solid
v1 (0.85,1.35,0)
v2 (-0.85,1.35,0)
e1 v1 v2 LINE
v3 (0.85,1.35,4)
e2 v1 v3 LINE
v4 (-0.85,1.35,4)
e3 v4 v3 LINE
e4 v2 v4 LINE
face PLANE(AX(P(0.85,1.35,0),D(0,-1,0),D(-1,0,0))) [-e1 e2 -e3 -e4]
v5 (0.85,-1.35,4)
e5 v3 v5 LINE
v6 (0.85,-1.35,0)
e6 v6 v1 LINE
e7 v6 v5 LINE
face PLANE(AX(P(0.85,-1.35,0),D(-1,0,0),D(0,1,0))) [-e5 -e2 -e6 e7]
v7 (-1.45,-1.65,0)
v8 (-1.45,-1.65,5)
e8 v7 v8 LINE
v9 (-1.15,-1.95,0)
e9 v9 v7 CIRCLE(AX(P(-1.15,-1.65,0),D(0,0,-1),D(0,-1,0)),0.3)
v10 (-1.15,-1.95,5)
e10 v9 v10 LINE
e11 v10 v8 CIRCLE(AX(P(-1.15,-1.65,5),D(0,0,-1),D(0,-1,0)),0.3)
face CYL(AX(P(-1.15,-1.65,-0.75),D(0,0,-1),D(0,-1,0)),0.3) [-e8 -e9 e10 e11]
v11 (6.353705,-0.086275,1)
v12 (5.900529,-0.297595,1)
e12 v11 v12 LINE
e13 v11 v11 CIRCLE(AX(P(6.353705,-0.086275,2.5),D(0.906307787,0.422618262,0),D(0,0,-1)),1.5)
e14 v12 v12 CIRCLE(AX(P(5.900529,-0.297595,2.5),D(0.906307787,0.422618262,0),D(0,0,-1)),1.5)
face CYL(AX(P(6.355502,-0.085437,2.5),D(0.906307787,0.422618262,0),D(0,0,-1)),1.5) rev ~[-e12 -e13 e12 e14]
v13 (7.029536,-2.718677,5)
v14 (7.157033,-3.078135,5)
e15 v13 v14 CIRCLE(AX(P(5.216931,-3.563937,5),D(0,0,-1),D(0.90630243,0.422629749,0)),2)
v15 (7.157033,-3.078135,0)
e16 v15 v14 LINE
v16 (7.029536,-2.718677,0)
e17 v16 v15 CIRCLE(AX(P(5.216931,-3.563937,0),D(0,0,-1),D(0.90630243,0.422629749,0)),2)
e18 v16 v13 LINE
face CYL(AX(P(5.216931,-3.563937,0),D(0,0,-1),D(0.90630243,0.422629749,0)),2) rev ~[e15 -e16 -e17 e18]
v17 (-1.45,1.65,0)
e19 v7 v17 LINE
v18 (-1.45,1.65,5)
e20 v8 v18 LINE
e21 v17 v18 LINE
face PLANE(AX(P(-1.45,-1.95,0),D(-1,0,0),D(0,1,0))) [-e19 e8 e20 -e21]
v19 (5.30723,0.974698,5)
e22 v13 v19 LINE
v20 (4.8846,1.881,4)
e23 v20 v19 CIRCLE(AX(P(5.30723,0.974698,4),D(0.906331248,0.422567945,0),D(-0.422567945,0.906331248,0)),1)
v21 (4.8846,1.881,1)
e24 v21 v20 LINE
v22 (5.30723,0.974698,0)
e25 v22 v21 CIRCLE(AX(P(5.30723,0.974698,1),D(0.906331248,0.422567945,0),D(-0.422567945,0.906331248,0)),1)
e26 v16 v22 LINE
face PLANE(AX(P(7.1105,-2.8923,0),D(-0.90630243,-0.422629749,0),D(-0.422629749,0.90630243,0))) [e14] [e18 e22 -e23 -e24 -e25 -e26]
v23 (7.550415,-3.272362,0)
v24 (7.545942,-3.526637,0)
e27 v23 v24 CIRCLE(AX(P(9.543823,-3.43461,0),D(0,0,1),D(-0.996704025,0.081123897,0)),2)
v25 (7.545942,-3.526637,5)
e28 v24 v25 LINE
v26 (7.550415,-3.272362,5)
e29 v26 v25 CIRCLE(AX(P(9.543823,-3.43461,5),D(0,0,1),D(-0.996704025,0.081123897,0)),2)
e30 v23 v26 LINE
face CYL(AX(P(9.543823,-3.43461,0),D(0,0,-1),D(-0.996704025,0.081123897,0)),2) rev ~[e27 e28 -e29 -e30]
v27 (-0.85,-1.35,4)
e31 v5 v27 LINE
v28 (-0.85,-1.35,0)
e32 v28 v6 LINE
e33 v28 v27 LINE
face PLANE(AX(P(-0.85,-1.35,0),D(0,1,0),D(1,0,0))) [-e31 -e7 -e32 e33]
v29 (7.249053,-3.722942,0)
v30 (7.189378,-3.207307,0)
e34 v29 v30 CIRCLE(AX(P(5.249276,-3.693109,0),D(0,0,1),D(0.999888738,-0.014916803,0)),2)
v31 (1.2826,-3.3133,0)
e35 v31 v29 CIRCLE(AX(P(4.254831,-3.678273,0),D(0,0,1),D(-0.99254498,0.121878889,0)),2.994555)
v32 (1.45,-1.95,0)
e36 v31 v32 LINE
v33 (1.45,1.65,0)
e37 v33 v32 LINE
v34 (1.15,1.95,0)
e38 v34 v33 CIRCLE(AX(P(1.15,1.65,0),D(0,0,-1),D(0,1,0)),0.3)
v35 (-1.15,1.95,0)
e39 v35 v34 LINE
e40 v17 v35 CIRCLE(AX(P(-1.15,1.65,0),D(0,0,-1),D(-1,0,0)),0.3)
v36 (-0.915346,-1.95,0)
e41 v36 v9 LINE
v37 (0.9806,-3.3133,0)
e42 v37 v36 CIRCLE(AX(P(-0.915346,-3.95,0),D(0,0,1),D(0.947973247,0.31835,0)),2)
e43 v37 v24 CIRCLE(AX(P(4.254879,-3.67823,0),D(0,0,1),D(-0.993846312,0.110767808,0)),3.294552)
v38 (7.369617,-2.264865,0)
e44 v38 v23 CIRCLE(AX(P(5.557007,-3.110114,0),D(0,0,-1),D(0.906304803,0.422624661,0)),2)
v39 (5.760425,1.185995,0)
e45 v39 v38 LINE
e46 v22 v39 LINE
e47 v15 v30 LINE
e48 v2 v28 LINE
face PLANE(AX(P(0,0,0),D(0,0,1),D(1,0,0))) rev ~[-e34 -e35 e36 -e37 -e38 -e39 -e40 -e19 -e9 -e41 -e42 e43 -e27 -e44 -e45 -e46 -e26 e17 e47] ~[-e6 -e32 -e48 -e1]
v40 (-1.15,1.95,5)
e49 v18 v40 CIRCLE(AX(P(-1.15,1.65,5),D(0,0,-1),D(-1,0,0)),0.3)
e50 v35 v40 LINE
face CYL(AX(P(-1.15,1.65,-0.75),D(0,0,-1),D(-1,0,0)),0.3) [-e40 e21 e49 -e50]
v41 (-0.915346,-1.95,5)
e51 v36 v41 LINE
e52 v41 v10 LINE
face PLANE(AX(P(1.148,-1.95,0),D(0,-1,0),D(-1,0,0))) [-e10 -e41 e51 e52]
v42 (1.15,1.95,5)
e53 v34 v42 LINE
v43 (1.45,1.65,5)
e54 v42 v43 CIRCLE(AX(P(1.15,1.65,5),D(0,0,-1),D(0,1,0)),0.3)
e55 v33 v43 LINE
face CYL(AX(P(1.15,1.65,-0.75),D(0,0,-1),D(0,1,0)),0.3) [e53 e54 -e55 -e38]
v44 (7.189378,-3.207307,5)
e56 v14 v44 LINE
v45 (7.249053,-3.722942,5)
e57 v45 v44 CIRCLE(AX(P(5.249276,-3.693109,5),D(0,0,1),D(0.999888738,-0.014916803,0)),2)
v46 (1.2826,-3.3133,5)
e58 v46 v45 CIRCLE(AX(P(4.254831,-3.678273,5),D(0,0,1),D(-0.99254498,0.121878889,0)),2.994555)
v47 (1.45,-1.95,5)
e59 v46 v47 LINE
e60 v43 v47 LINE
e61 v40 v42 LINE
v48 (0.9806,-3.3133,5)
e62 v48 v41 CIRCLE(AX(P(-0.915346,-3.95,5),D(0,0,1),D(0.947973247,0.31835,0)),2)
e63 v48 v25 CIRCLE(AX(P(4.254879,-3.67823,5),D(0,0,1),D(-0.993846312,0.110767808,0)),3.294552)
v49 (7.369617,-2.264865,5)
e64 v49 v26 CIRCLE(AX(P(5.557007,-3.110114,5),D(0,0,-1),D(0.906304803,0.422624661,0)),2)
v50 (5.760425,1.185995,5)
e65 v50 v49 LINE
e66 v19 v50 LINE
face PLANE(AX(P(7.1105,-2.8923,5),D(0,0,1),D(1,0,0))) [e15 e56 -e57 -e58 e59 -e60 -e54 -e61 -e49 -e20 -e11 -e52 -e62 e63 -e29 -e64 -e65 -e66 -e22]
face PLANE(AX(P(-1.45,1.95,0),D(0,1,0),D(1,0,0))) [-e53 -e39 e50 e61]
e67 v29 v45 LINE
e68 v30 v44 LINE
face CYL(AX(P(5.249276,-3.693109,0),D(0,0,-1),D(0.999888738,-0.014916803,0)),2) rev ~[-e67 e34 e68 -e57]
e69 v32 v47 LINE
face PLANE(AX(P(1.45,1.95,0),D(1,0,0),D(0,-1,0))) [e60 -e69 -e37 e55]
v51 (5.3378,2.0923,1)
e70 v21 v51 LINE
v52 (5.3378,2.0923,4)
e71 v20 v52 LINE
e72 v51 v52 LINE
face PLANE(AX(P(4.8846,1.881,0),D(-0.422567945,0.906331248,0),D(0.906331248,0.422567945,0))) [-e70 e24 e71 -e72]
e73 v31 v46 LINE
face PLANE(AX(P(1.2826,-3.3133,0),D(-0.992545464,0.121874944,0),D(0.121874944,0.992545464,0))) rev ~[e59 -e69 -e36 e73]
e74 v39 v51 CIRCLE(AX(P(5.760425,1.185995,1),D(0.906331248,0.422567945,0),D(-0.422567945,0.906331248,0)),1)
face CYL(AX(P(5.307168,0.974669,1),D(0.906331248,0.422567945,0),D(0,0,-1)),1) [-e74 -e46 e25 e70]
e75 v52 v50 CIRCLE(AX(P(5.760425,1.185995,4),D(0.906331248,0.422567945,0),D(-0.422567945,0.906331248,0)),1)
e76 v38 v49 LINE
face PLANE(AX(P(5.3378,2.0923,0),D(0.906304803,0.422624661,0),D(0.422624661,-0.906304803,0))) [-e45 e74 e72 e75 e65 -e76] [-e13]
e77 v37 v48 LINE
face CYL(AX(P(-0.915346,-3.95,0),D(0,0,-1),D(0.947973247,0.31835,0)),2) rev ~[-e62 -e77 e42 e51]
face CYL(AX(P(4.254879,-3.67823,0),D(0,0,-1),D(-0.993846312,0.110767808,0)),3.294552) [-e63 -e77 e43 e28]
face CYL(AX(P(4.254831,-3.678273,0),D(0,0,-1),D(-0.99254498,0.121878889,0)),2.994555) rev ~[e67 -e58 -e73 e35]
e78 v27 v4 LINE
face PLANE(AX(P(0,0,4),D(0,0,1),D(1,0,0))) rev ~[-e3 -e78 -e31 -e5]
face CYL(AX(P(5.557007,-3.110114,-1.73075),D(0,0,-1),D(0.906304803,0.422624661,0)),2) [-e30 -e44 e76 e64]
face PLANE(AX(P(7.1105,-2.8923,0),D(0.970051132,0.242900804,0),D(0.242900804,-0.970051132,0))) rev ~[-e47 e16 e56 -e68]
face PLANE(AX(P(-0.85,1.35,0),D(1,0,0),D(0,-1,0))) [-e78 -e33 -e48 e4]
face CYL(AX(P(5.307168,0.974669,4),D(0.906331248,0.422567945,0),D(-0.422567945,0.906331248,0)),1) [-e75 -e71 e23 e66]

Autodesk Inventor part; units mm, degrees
ref_plane "YZ Plane" through (0, 0, 0) normal (1, 0, 0) x (0, 1, 0)
ref_plane "XZ Plane" through (0, 0, 0) normal (0, 1, 0) x (-1, 0, 0)
ref_plane "XY Plane" through (0, 0, 0) normal (0, 0, 1) x (1, 0, 0)
sketch "Sketch1" plane through (0, 0, 0) normal (0, 0, 1) x (1, 0, 0)
  line L0 (-0.85, -1.35) -> (0.85, -1.35)
  line L1 (0.85, -1.35) -> (0.85, 1.35)
  line L2 (0.85, 1.35) -> (-0.85, 1.35)
  line L3 (-0.85, 1.35) -> (-0.85, -1.35)
  line L4 (-0.85, -1.35) -> (0.85, 1.35) construction
  line L5 (0.85, -1.35) -> (-0.85, 1.35) construction
  line L6 (7.1105, -2.8923) -> (4.8846, 1.881)
  line L7 (4.8846, 1.881) -> (5.3378, 2.0923)
  line L8 (5.3378, 2.0923) -> (7.6622, -2.8923)
  line L9 (-1.45, 1.95) -> (1.45, 1.95)
  line L10 (1.45, 1.95) -> (1.45, -1.95)
  line L11 (1.148, -1.95) -> (-1.45, -1.95)
  line L12 (-1.45, -1.95) -> (-1.45, 1.95)
  line L13 (1.45, -1.95) -> (1.148, -1.95) construction
  line L14 (1.148, -1.95) -> (0.9806, -3.3133)
  line L15 (0.9806, -3.3133) -> (1.2826, -3.3133) construction
  line L16 (1.2826, -3.3133) -> (1.45, -1.95)
  line L17 (7.6622, -2.8923) -> (7.1105, -2.8923) construction
  line L18 (7.2357, -3.3923) -> (7.537, -3.3923) construction
  arc A0 (1.2826, -3.3133) -> (7.2357, -3.3923) centre (4.2548, -3.6783) ccw
  arc A1 (0.9806, -3.3133) -> (7.537, -3.3923) centre (4.2548, -3.6783) ccw
  line L19 (7.537, -3.3923) -> (7.6622, -2.8923)
  line L20 (7.1105, -2.8923) -> (7.2357, -3.3923)
  point P0 (0, 0)
  point P1 (6.5, -0.4)
  dimension "d0" = 1.7
  dimension "d1" = 2.7
  dimension "d4" = 0.5
  dimension "d5" = 5.5
  dimension "d16" = 0.6
  dimension "d17" = 0.6
  dimension "d18" = 0.6
  dimension "d19" = 0.6
  dimension "d20" = 25
  dimension "d21" = 6.5
  dimension "d22" = 0.3
  dimension "d25" = 0.5
  dimension "d38" = 83
  dimension "d39" = 0.4
extrude "Extrusion1" add sketch "Sketch1" along normal blind 5
fillet "Fillet1" radius 2 5 edges at (1.148, -1.95, 2.5) (7.537, -3.3923, 2.5) (7.6622, -2.8923, 2.5) (7.1105, -2.8923, 2.5) (7.2357, -3.3923, 2.5)
fillet "Fillet1" radius 0.3 3 edges at (-1.45, -1.95, 2.5) (-1.45, 1.95, 2.5) (1.45, 1.95, 2.5)
sketch "Sketch3" plane through (0, 0, 5) normal (0, 0, 1) x (1, 0, 0)
  line L0 (-0.85, 1.35) -> (0.85, 1.35) projected
  line L1 (-0.85, -1.35) -> (-0.85, 1.35) projected
  line L2 (0.85, 1.35) -> (0.85, -1.35) projected
  line L3 (0.85, -1.35) -> (-0.85, -1.35) projected
  point P0 (0, 0)
extrude "Extrusion3" add sketch "Sketch3" against normal blind 1
sketch "Sketch4" plane through (5.3378, 2.0923, 5) normal (0.9063078, 0.4226183, 0) x (0, 0, -1)
  line L0 (0, -4.8077) -> (5, 0) construction
  circle A0 centre (2.5, -2.4038) radius 1.5
  line L1 (0, -4.8077) -> (0, 0) projected
  line L2 (5, -4.8077) -> (5, 0) projected
  dimension "d33" = 3
extrude "Extrusion4" cut sketch "Sketch4" against normal up to surface (0.5 mm away)
fillet "Fillet3" radius 1 2 edges at (5.1112, 1.9867, 0) (5.1112, 1.9867, 5)
properties part number "ValveSpring"
